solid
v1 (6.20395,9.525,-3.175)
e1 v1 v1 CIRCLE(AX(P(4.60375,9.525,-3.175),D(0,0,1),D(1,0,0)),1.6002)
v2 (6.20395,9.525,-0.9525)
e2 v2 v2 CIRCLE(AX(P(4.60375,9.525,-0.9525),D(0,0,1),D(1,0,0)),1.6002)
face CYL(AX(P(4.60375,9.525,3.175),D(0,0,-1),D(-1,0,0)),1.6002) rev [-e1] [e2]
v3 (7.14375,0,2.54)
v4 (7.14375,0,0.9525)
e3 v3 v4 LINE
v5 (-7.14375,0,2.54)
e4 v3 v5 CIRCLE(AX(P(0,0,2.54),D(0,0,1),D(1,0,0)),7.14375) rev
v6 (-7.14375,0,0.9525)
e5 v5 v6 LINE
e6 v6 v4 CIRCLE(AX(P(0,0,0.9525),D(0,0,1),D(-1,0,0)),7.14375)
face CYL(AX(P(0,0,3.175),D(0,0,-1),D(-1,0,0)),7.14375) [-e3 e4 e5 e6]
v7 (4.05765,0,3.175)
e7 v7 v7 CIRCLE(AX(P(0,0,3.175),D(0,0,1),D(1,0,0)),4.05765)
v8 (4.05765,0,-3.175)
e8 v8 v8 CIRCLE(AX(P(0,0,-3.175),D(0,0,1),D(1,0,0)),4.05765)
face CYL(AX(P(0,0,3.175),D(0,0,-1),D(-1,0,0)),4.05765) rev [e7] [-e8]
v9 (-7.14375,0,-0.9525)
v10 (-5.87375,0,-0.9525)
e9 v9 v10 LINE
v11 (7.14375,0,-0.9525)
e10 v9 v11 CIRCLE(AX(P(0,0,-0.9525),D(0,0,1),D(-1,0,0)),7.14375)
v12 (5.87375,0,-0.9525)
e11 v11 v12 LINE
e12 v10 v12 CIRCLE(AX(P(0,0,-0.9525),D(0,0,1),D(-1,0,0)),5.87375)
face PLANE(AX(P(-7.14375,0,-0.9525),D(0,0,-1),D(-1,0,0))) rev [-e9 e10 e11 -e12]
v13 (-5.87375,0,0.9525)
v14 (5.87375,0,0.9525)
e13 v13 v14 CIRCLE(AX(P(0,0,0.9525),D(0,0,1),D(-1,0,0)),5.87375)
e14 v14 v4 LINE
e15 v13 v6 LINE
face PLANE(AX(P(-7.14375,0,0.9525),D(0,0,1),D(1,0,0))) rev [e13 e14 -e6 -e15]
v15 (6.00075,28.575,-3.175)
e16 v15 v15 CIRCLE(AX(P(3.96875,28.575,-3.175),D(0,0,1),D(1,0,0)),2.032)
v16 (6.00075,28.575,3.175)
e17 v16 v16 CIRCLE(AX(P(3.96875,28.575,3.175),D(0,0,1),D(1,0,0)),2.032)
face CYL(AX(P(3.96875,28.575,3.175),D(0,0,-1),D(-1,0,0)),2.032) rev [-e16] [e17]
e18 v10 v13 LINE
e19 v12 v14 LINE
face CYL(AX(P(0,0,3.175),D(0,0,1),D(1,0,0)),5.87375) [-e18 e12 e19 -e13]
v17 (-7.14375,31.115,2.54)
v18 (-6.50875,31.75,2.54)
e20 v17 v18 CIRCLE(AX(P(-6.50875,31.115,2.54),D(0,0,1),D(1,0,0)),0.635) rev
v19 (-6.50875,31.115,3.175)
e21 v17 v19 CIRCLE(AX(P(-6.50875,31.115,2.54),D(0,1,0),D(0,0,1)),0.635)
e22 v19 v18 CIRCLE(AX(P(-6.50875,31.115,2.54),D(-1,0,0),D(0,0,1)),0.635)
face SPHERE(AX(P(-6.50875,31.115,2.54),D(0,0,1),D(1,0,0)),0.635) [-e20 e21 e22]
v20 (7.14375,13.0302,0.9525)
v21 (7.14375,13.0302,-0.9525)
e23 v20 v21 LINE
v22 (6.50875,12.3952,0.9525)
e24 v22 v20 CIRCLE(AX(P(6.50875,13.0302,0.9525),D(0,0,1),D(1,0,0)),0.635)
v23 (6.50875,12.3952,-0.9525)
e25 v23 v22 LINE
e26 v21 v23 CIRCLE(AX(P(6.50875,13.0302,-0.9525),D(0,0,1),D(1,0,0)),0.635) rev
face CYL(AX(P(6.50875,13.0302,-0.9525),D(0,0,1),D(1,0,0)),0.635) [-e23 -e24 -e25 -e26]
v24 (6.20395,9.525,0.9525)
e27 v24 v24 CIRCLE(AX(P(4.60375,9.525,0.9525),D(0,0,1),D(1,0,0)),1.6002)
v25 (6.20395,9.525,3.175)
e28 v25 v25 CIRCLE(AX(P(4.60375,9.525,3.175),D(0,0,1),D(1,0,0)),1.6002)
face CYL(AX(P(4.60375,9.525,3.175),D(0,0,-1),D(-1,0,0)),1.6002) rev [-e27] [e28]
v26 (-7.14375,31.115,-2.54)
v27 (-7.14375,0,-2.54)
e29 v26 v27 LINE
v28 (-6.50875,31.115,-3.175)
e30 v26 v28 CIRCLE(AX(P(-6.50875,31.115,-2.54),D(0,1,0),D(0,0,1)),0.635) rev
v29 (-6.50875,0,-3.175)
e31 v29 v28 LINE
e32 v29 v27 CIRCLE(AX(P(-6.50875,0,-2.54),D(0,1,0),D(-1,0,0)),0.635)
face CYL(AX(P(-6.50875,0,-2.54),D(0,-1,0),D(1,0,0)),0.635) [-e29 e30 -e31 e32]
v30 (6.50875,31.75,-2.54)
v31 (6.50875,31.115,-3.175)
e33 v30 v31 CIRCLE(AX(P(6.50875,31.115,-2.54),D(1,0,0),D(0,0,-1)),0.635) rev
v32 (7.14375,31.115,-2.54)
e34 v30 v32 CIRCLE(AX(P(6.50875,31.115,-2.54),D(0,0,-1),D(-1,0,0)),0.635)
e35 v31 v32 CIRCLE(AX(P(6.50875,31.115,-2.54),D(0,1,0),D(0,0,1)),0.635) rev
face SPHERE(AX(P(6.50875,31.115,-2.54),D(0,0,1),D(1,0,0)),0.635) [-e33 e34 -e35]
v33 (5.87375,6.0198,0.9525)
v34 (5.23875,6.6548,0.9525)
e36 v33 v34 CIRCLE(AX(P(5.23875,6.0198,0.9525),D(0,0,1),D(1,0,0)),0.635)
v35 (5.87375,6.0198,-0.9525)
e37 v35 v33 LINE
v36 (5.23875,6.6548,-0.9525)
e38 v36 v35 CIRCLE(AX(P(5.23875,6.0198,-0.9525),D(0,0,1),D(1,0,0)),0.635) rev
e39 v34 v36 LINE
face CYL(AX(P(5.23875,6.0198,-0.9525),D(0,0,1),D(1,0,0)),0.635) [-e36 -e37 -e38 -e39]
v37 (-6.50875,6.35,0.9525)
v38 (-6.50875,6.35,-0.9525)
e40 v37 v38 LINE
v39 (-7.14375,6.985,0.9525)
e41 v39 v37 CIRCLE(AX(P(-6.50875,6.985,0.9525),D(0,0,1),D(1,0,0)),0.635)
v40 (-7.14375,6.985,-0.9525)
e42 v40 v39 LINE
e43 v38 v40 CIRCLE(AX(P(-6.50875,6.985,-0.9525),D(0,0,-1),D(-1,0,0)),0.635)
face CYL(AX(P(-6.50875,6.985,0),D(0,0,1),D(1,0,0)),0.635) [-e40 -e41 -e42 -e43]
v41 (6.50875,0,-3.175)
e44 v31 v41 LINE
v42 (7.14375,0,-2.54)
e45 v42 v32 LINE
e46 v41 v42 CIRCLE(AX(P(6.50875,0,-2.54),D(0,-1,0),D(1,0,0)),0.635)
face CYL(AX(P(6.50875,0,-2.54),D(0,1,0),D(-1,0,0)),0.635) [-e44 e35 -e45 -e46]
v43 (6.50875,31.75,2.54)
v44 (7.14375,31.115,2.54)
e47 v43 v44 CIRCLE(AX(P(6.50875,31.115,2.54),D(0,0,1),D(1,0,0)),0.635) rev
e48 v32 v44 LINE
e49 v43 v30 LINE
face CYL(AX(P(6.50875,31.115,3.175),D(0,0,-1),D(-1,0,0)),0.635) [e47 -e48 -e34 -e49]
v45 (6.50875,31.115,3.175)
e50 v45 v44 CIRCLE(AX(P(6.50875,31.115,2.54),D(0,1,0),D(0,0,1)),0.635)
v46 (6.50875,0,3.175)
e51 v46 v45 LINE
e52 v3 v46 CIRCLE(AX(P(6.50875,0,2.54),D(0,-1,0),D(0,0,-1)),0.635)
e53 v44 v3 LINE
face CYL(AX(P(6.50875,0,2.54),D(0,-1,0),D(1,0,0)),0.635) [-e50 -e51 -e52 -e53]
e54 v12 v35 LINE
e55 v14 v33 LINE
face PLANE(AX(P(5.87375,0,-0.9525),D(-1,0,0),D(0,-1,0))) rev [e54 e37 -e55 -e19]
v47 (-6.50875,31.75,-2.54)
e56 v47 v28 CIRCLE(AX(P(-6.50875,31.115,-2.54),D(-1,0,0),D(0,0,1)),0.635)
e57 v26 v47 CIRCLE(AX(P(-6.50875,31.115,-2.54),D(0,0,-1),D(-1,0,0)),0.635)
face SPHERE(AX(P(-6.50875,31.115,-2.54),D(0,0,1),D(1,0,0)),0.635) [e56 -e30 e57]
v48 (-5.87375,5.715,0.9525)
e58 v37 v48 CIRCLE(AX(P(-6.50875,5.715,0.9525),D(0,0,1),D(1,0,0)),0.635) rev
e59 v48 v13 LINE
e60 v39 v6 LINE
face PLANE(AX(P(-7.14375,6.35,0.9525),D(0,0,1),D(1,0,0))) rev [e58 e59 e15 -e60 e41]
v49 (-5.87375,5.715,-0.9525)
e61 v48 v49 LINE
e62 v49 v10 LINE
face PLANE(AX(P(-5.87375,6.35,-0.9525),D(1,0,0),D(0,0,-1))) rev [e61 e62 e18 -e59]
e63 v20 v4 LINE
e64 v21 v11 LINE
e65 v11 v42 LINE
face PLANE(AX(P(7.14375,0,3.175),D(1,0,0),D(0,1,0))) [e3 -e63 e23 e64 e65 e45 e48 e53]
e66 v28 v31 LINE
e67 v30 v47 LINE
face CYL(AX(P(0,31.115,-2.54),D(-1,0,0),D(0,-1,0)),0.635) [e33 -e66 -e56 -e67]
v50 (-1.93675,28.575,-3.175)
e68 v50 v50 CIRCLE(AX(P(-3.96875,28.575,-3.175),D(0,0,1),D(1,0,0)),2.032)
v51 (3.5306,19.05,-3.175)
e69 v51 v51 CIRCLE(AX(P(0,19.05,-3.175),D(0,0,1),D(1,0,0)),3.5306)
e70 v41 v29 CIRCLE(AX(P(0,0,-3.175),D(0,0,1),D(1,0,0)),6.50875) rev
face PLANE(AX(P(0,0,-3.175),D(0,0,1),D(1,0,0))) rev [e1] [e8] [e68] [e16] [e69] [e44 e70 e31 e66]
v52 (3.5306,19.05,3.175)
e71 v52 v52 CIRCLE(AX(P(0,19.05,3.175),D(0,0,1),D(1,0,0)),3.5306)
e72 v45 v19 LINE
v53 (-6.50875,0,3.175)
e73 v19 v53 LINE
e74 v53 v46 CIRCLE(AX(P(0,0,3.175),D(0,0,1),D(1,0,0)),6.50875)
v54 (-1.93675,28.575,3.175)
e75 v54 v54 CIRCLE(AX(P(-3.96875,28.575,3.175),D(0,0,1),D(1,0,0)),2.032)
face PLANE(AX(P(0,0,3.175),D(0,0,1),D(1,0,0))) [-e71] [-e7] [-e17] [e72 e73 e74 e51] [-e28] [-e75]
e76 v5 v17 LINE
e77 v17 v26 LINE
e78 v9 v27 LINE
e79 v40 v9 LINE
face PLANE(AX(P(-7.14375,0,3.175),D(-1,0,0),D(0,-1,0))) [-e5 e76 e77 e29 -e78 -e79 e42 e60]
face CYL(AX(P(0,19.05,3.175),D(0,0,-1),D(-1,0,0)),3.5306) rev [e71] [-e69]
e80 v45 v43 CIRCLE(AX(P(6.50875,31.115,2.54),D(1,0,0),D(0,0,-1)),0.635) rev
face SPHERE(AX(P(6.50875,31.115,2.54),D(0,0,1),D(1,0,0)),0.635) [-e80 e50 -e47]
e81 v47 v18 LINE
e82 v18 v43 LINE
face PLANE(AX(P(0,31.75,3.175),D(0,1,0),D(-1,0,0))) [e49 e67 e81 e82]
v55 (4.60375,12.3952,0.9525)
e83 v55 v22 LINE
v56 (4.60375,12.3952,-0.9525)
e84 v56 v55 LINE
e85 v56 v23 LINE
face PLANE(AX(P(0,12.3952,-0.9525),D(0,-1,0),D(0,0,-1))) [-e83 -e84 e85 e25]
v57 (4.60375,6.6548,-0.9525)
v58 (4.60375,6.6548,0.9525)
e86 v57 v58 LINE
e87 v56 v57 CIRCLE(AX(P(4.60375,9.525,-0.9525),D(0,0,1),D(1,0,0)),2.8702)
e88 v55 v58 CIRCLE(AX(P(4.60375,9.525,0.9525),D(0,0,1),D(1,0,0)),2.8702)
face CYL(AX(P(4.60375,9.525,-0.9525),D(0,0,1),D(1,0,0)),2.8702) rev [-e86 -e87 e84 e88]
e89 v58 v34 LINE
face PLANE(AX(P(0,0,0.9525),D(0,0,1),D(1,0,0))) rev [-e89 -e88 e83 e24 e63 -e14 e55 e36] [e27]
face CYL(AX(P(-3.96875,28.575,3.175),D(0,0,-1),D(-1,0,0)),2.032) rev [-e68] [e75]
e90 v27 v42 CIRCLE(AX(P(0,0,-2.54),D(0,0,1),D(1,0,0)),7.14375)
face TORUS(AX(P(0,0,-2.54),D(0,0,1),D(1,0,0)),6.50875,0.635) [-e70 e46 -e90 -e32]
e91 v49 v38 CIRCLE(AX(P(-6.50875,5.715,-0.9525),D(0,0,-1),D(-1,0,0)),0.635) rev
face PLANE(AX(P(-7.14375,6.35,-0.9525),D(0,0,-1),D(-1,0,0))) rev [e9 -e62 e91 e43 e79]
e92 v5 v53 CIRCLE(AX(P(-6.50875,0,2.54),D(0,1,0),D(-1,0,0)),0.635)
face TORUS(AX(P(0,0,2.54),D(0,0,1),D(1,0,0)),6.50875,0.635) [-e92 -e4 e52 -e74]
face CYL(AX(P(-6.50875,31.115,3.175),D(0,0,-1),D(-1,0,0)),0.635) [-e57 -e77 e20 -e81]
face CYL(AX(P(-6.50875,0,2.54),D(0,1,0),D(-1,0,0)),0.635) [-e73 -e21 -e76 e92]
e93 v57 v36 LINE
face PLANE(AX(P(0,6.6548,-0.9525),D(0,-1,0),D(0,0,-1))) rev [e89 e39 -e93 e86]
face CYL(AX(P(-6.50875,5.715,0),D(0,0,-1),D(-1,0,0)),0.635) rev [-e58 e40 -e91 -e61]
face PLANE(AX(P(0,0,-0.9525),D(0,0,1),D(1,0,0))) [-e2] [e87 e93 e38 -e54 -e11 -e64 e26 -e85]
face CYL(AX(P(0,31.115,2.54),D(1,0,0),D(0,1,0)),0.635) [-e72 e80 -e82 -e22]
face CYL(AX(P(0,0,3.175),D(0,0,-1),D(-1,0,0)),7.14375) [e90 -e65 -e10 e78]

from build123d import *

# Parameters (mm, degrees)
SKETCH1_R           = 4.05765
SKETCH1_R_2         = 3.5306
SKETCH1_R_3         = 2.032
SKETCH1_R_4         = 1.6002
BOSS_EXTRUDE1_DEPTH = 3.175
SKETCH1_7_R         = 1.6002
CUT_EXTRUDE4_DEPTH  = 0.9525
SKETCH3_W           = 1.27
SKETCH3_H           = 1.905
FILLET1_R           = 0.635
FILLET2_R           = 0.635


with BuildPart() as part:
    # Sketch1 → Boss-Extrude1 (new, symmetric)
    with BuildSketch(Plane.XY):
        with BuildLine():
            Line((7.14375, 31.75), (7.14375, 0))
            ThreePointArc((7.14375, 0), (0, -7.14375), (-7.14375, 0))
            Line((-7.14375, 0), (-7.14375, 31.75))
            Line((-7.14375, 31.75), (7.14375, 31.75))
        make_face()
        Circle(SKETCH1_R, mode=Mode.SUBTRACT)
        with Locations((0, 19.05)):
            Circle(SKETCH1_R_2, mode=Mode.SUBTRACT)
        with Locations((-3.96875, 28.575)):
            Circle(SKETCH1_R_3, mode=Mode.SUBTRACT)
        with Locations((3.96875, 28.575)):
            Circle(SKETCH1_R_3, mode=Mode.SUBTRACT)
        with Locations((4.60375, 9.525)):
            Circle(SKETCH1_R_4, mode=Mode.SUBTRACT)
    extrude(amount=BOSS_EXTRUDE1_DEPTH, both=True)

    # Sketch1<7> → Cut-Extrude4 (cut, symmetric)
    with BuildSketch(Plane.XY):
        with BuildLine():
            Line((7.14375, 6.6548), (7.14375, 12.3952))
            Line((7.14375, 12.3952), (4.60375, 12.3952))
            ThreePointArc((4.60375, 12.3952), (1.73355, 9.525), (4.60375, 6.6548))
            Line((4.60375, 6.6548), (7.14375, 6.6548))
        make_face()
        with Locations((4.60375, 9.525)):
            Circle(SKETCH1_7_R, mode=Mode.SUBTRACT)
    extrude(amount=CUT_EXTRUDE4_DEPTH, both=True, mode=Mode.SUBTRACT)

    # Cut-Sweep1: sweep along a path in Sketch2
    with BuildLine(Plane.XY.offset(3.175)) as cut_sweep1_path:
        Line((7.14375, 6.6548), (7.14375, 0))
        ThreePointArc((7.14375, 0), (0, -7.14375), (-7.14375, 0))
        Line((-7.14375, 0), (-7.14375, 6.35))
    # Sketch3 → Cut-Sweep1 (sweep, cut)
    with BuildSketch(Plane(origin=(0, 6.6548, 0), x_dir=(1, 0, 0), z_dir=(0, 1, 0))):
        with Locations((6.50875, 0)):
            Rectangle(SKETCH3_W, SKETCH3_H)
    sweep(path=cut_sweep1_path.line, mode=Mode.SUBTRACT)

    # Fillet1
    fillet1_edges = [part.edges().sort_by_distance(p)[0] for p in [
        (0, -7.14375, 3.175),
        (-7.14375, 15.875, -3.175),
        (0, 31.75, -3.175),
        (7.14375, 15.875, 3.175),
        (7.14375, 15.875, -3.175),
        (0, -7.14375, -3.175),
        (-7.14375, 31.75, 0),
        (7.14375, 31.75, 0),
        (0, 31.75, 3.175),
        (-7.14375, 15.875, 3.175),
    ]]
    fillet(fillet1_edges, radius=FILLET1_R)

    # Fillet2
    fillet2_edges = [part.edges().sort_by_distance(p)[0] for p in [
        (5.87375, 6.6548, 0),
        (7.14375, 12.3952, 0),
        (-7.14375, 6.35, 0),
        (-5.87375, 6.35, 0),
    ]]
    fillet(fillet2_edges, radius=FILLET2_R - 0.0001)  # a hair under: the kernel refuses the full size


solid = part.part
